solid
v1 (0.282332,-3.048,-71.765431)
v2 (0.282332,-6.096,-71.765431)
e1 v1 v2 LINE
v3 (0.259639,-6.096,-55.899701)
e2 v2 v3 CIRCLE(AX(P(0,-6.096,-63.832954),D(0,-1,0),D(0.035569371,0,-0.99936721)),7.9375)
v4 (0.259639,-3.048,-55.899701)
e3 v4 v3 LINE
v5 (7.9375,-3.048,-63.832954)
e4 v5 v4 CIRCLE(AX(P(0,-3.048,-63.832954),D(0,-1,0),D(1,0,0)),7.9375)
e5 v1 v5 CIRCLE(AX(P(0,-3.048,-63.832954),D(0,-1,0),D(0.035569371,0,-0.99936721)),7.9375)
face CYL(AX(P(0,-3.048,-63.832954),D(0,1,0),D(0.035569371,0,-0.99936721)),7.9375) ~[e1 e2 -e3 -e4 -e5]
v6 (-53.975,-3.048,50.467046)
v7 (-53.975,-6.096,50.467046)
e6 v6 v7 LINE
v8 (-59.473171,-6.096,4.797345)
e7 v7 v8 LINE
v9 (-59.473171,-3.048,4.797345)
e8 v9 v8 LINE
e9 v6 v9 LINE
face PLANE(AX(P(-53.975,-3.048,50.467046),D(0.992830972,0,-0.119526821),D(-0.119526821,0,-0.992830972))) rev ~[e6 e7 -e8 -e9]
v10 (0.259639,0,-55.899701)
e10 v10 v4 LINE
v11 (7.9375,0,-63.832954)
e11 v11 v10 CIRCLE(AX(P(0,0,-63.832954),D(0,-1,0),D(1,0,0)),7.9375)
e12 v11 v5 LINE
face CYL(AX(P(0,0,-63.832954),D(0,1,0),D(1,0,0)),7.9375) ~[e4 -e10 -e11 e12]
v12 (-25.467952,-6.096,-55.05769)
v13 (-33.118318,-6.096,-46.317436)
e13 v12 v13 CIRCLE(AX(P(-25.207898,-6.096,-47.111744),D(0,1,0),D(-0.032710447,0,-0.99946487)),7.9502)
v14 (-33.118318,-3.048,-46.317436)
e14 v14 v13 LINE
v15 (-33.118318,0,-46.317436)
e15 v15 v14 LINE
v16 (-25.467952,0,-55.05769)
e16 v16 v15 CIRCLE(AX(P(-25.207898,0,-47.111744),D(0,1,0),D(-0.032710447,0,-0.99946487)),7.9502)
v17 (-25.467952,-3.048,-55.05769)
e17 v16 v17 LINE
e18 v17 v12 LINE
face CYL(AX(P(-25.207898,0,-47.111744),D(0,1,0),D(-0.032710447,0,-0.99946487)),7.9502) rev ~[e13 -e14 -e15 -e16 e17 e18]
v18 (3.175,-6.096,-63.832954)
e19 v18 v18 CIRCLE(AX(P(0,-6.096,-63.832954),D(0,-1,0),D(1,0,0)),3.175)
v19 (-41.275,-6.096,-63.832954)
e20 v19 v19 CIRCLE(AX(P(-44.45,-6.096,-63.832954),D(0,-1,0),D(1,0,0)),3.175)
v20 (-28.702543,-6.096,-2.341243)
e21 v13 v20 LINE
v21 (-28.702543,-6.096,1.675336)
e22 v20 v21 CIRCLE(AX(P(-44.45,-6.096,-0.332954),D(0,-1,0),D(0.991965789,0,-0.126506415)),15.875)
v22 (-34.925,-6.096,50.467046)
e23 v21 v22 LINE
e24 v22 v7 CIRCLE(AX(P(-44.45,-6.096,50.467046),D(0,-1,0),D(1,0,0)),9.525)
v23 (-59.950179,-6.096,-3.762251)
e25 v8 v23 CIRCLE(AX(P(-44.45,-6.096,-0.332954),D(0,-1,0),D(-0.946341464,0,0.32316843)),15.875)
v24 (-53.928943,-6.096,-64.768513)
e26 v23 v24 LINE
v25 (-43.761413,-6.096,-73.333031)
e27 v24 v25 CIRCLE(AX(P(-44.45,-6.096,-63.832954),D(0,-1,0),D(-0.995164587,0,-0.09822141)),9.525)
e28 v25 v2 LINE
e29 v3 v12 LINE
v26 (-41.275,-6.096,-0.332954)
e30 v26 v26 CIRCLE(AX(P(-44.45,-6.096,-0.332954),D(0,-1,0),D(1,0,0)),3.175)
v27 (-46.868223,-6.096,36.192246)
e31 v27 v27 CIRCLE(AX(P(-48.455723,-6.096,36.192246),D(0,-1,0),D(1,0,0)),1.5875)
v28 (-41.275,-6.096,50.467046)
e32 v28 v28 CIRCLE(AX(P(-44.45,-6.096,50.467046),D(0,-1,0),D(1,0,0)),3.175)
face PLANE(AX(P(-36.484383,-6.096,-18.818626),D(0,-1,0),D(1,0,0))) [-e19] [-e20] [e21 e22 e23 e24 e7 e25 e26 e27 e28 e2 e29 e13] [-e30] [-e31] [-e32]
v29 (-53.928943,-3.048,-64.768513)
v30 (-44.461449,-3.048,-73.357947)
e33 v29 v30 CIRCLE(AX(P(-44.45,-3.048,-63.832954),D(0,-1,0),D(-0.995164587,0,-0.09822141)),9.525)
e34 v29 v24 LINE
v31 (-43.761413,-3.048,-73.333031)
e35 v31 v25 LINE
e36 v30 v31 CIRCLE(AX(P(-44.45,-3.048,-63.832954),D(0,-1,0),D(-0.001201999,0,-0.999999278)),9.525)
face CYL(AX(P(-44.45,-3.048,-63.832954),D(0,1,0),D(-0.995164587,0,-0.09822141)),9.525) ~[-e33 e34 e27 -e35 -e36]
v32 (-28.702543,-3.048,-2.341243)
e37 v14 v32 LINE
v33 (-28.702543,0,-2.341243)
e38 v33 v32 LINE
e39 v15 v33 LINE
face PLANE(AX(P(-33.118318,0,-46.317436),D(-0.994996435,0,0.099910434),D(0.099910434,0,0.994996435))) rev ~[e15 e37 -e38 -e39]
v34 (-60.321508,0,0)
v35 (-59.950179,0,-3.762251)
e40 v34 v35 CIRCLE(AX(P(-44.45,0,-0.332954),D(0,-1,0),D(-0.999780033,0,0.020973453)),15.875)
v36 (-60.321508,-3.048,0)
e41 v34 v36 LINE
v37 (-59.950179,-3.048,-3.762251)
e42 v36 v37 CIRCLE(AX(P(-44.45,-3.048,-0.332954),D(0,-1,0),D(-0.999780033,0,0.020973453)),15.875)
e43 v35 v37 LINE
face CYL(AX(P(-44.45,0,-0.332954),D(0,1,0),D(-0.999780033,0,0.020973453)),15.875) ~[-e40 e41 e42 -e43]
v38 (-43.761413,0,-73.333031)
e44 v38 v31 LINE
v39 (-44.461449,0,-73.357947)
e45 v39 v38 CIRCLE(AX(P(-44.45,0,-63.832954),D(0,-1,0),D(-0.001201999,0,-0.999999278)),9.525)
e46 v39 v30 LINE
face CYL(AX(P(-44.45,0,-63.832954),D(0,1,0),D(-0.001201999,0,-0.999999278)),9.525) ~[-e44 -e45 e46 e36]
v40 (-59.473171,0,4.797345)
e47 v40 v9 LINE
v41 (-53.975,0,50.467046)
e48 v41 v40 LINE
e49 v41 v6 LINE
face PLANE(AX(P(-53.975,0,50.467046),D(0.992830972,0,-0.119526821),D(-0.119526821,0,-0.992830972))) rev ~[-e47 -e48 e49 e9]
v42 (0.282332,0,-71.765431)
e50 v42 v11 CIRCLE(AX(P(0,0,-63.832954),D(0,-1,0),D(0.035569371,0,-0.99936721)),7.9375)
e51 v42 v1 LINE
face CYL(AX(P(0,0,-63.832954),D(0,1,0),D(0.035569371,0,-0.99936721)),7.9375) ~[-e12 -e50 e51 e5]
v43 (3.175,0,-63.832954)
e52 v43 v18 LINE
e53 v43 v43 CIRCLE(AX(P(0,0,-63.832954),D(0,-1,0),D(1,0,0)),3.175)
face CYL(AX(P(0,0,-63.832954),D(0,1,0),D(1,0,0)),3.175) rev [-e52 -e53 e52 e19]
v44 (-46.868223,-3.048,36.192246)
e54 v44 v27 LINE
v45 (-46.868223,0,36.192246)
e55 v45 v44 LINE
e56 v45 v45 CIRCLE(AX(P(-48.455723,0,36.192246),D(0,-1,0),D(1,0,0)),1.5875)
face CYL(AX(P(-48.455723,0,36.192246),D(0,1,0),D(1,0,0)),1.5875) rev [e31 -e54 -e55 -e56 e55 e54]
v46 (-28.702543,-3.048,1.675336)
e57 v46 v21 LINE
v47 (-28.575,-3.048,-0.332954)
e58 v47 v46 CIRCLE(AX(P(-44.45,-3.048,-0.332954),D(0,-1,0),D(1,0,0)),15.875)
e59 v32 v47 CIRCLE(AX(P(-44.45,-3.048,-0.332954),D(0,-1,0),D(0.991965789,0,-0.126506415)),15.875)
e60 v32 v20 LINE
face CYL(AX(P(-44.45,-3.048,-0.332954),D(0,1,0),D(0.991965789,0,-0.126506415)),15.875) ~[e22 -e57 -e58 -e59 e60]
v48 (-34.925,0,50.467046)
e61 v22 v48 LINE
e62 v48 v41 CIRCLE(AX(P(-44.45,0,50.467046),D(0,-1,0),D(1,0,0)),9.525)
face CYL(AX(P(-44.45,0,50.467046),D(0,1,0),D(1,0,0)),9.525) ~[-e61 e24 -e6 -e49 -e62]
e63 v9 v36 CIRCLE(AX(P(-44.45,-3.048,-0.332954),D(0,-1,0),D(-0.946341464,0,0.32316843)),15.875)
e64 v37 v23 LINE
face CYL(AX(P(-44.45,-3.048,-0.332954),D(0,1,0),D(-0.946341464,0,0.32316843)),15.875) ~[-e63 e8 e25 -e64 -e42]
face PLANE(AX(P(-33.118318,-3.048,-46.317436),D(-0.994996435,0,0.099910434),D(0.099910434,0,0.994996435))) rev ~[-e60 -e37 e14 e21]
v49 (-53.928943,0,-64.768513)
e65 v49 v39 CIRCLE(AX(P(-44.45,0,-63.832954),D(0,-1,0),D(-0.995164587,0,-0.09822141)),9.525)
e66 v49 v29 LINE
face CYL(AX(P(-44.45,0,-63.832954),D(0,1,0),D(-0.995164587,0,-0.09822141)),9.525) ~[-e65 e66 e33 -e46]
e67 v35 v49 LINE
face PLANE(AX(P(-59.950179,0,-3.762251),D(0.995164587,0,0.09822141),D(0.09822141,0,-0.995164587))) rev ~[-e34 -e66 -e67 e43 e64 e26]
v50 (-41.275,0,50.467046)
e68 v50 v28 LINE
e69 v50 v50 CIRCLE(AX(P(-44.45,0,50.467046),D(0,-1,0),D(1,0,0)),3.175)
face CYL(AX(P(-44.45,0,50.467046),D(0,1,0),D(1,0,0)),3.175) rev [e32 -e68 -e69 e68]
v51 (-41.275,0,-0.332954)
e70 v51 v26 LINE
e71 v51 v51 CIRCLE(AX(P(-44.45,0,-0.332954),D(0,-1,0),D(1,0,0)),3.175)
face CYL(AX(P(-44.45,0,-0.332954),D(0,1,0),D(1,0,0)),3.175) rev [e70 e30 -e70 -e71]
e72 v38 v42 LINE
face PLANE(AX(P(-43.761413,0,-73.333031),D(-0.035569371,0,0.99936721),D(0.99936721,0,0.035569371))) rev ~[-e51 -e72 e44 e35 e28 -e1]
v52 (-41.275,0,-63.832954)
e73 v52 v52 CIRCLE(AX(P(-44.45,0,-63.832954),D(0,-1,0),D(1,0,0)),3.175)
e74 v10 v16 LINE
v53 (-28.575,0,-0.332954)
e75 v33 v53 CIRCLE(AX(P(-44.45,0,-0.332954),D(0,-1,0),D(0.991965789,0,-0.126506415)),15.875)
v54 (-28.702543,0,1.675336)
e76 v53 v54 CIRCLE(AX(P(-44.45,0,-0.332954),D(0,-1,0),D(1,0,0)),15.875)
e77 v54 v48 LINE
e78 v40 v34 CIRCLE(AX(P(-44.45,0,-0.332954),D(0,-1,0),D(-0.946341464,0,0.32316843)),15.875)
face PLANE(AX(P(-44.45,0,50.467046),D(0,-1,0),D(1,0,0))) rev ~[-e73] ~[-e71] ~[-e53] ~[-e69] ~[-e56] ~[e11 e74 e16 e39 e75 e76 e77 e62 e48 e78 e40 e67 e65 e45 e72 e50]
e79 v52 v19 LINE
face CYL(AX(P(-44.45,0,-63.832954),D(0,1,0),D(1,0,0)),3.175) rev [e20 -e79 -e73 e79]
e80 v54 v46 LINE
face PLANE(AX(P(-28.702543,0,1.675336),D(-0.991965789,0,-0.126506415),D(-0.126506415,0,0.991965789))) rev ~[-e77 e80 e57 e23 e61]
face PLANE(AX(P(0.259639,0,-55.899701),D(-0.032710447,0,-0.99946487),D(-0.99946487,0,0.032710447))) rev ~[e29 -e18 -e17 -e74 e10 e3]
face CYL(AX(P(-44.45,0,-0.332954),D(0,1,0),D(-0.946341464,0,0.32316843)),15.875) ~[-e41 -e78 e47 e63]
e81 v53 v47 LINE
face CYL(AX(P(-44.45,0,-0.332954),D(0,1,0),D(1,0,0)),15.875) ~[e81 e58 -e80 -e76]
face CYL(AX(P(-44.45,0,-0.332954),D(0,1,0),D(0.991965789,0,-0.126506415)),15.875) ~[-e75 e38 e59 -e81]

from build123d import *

# Parameters (mm, degrees)
F0_R        = 3.175
F0_R_2      = 1.5875
F1_DEPTH    = 3.048
F1_FACE_R   = 3.175
F1_FACE_R_2 = 1.5875
F2_DEPTH    = 3.048


# Not quite as in the source:
# - after a boolean that leaves OpenCascade's solid faulty, fix() repairs it


with BuildPart() as f1:
    # F0 (on Front) → F1 (new body)
    with BuildSketch(Plane.XZ):
        with BuildLine():
            ThreePointArc((-53.975, 50.4670464277), (-44.45, 40.9420464277), (-34.925, 50.4670464277))
            ThreePointArc((-34.925, 50.4670464277), (-44.45, 59.9920464277), (-53.975, 50.4670464277))
        make_face()
        with Locations((-44.45, 50.4670464277)):
            Circle(F0_R, mode=Mode.SUBTRACT)
        with BuildLine():
            Line((-28.7025430953, 1.6753357581), (-34.925, 50.4670464277))
            ThreePointArc((-34.925, 50.4670464277), (-44.45, 40.9420464277), (-53.975, 50.4670464277))
            Line((-53.975, 50.4670464277), (-59.4731707335, 4.7973452602))
            ThreePointArc((-59.4731707335, 4.7973452602), (-42.8475383164, 15.4609611278), (-28.7025430953, 1.6753357581))
        make_face()
        with Locations((-48.45572263, 36.1922464277)):
            Circle(F0_R_2, mode=Mode.SUBTRACT)
        with BuildLine():
            ThreePointArc((-28.575, -0.3329535723), (-28.6069178604, 0.6732140673), (-28.7025430953, 1.6753357581))
            ThreePointArc((-28.7025430953, 1.6753357581), (-42.8475383164, 15.4609611278), (-59.4731707335, 4.7973452602))
            ThreePointArc((-59.4731707335, 4.7973452602), (-60.0824637934, 2.4314090575), (-60.3215080228, 0))
            Line((-60.3215080228, 0), (-59.9501789354, -3.7622505804))
            ThreePointArc((-59.9501789354, -3.7622505804), (-43.7288188136, -16.1915639369), (-28.7025430953, -2.3412429026))
            ThreePointArc((-28.7025430953, -2.3412429026), (-28.6069178604, -1.3391212118), (-28.575, -0.3329535723))
        make_face()
        with Locations((-44.45, -0.3329535723)):
            Circle(F0_R, mode=Mode.SUBTRACT)
        with BuildLine():
            Line((-59.9501789354, -3.7622505804), (-60.3215080228, 0))
            ThreePointArc((-60.3215080228, 0), (-60.2482378134, -1.8922184603), (-59.9501789354, -3.7622505804))
        make_face()
        with BuildLine():
            Line((-33.1183182382, -46.317436026), (-28.7025430953, -2.3412429026))
            ThreePointArc((-28.7025430953, -2.3412429026), (-43.7288188136, -16.1915639369), (-59.9501789354, -3.7622505804))
            Line((-59.9501789354, -3.7622505804), (-53.928942688, -64.7685125051))
            ThreePointArc((-53.928942688, -64.7685125051), (-44.9183459706, -54.3194748683), (-34.925, -63.8329535723))
            ThreePointArc((-34.925, -63.8329535723), (-37.4756032752, -70.3201267105), (-43.7614126668, -73.3330310711))
            Line((-43.7614126668, -73.3330310711), (0.2823318858, -71.7654307992))
            ThreePointArc((0.2823318858, -71.7654307992), (-7.9374918809, -63.8443065466), (0.2596391732, -55.8997011655))
            Line((0.2596391732, -55.8997011655), (-25.4679521782, -55.0576895661))
            ThreePointArc((-25.4679521782, -55.0576895661), (-31.1901358295, -52.3480122444), (-33.1183182382, -46.317436026))
        make_face()
        with BuildLine():
            ThreePointArc((-34.925, -63.8329535723), (-44.9183459706, -54.3194748683), (-53.928942688, -64.7685125051))
            ThreePointArc((-53.928942688, -64.7685125051), (-50.8501155234, -70.8873242945), (-44.4614490432, -73.3579466914))
            Line((-44.4614490432, -73.3579466914), (-43.7614126668, -73.3330310711))
            ThreePointArc((-43.7614126668, -73.3330310711), (-37.4756032752, -70.3201267105), (-34.925, -63.8329535723))
        make_face()
        with Locations((-44.45, -63.8329535723)):
            Circle(F0_R, mode=Mode.SUBTRACT)
        with BuildLine():
            Line((-43.7614126668, -73.3330310711), (-44.4614490432, -73.3579466914))
            ThreePointArc((-44.4614490432, -73.3579466914), (-44.111201737, -73.3519262446), (-43.7614126668, -73.3330310711))
        make_face()
        with BuildLine():
            ThreePointArc((7.9375, -63.8329535723), (5.7037177432, -58.3128530156), (0.2596391732, -55.8997011655))
            ThreePointArc((0.2596391732, -55.8997011655), (-7.9374918809, -63.8443065466), (0.2823318858, -71.7654307992))
            ThreePointArc((0.2823318858, -71.7654307992), (5.7116072866, -69.344890478), (7.9375, -63.8329535723))
        make_face()
        with Locations((0, -63.8329535723)):
            Circle(F0_R, mode=Mode.SUBTRACT)
    extrude(amount=F1_DEPTH)

    # F0 (on Front) + F1_face (on face) → F2 (join)
    with BuildSketch(Plane.XZ):
        with BuildLine():
            ThreePointArc((-53.975, 50.4670464277), (-44.45, 40.9420464277), (-34.925, 50.4670464277))
            ThreePointArc((-34.925, 50.4670464277), (-44.45, 59.9920464277), (-53.975, 50.4670464277))
        make_face()
        with Locations((-44.45, 50.4670464277)):
            Circle(F0_R, mode=Mode.SUBTRACT)
        with BuildLine():
            Line((-28.7025430953, 1.6753357581), (-34.925, 50.4670464277))
            ThreePointArc((-34.925, 50.4670464277), (-44.45, 40.9420464277), (-53.975, 50.4670464277))
            Line((-53.975, 50.4670464277), (-59.4731707335, 4.7973452602))
            ThreePointArc((-59.4731707335, 4.7973452602), (-42.8475383164, 15.4609611278), (-28.7025430953, 1.6753357581))
        make_face()
        with Locations((-48.45572263, 36.1922464277)):
            Circle(F0_R_2, mode=Mode.SUBTRACT)
        with BuildLine():
            ThreePointArc((-28.575, -0.3329535723), (-28.6069178604, 0.6732140673), (-28.7025430953, 1.6753357581))
            ThreePointArc((-28.7025430953, 1.6753357581), (-42.8475383164, 15.4609611278), (-59.4731707335, 4.7973452602))
            ThreePointArc((-59.4731707335, 4.7973452602), (-60.0824637934, 2.4314090575), (-60.3215080228, 0))
            Line((-60.3215080228, 0), (-59.9501789354, -3.7622505804))
            ThreePointArc((-59.9501789354, -3.7622505804), (-43.7288188136, -16.1915639369), (-28.7025430953, -2.3412429026))
            ThreePointArc((-28.7025430953, -2.3412429026), (-28.6069178604, -1.3391212118), (-28.575, -0.3329535723))
        make_face()
        with Locations((-44.45, -0.3329535723)):
            Circle(F0_R, mode=Mode.SUBTRACT)
        with BuildLine():
            Line((-59.9501789354, -3.7622505804), (-60.3215080228, 0))
            ThreePointArc((-60.3215080228, 0), (-60.2482378134, -1.8922184603), (-59.9501789354, -3.7622505804))
        make_face()
        with BuildLine():
            Line((-33.1183182382, -46.317436026), (-28.7025430953, -2.3412429026))
            ThreePointArc((-28.7025430953, -2.3412429026), (-43.7288188136, -16.1915639369), (-59.9501789354, -3.7622505804))
            Line((-59.9501789354, -3.7622505804), (-53.928942688, -64.7685125051))
            ThreePointArc((-53.928942688, -64.7685125051), (-44.9183459706, -54.3194748683), (-34.925, -63.8329535723))
            ThreePointArc((-34.925, -63.8329535723), (-37.4756032752, -70.3201267105), (-43.7614126668, -73.3330310711))
            Line((-43.7614126668, -73.3330310711), (0.2823318858, -71.7654307992))
            ThreePointArc((0.2823318858, -71.7654307992), (-7.9374918809, -63.8443065466), (0.2596391732, -55.8997011655))
            Line((0.2596391732, -55.8997011655), (-25.4679521782, -55.0576895661))
            ThreePointArc((-25.4679521782, -55.0576895661), (-31.1901358295, -52.3480122444), (-33.1183182382, -46.317436026))
        make_face()
        with BuildLine():
            ThreePointArc((-34.925, -63.8329535723), (-44.9183459706, -54.3194748683), (-53.928942688, -64.7685125051))
            ThreePointArc((-53.928942688, -64.7685125051), (-50.8501155234, -70.8873242945), (-44.4614490432, -73.3579466914))
            Line((-44.4614490432, -73.3579466914), (-43.7614126668, -73.3330310711))
            ThreePointArc((-43.7614126668, -73.3330310711), (-37.4756032752, -70.3201267105), (-34.925, -63.8329535723))
        make_face()
        with Locations((-44.45, -63.8329535723)):
            Circle(F0_R, mode=Mode.SUBTRACT)
        with BuildLine():
            Line((-43.7614126668, -73.3330310711), (-44.4614490432, -73.3579466914))
            ThreePointArc((-44.4614490432, -73.3579466914), (-44.111201737, -73.3519262446), (-43.7614126668, -73.3330310711))
        make_face()
        with BuildLine():
            ThreePointArc((7.9375, -63.8329535723), (5.7037177432, -58.3128530156), (0.2596391732, -55.8997011655))
            ThreePointArc((0.2596391732, -55.8997011655), (-7.9374918809, -63.8443065466), (0.2823318858, -71.7654307992))
            ThreePointArc((0.2823318858, -71.7654307992), (5.7116072866, -69.344890478), (7.9375, -63.8329535723))
        make_face()
        with Locations((0, -63.8329535723)):
            Circle(F0_R, mode=Mode.SUBTRACT)
    with BuildSketch(Plane(origin=(-39.2541813262, -3.048, -16.9379503901), x_dir=(1, 0, 0), z_dir=(0, -1, 0))):
        with BuildLine():
            ThreePointArc((4.3291813262, 67.4049968178), (-5.1958186738, 76.9299968178), (-14.7208186738, 67.4049968178))
            Line((-14.7208186738, 67.4049968178), (-20.2189894074, 21.7352956503))
            ThreePointArc((-20.2189894074, 21.7352956503), (-21.0462252614, 17.4883065075), (-20.6959976093, 13.1756998097))
            Line((-20.6959976093, 13.1756998097), (-14.6747613619, -47.830562115))
            ThreePointArc((-14.6747613619, -47.830562115), (-11.3322126787, -54.1799392572), (-4.5072313406, -56.395080681))
            Line((-4.5072313406, -56.395080681), (39.536513212, -54.8274804091))
            ThreePointArc((39.536513212, -54.8274804091), (47.1916732071, -46.8836502078), (39.5138204994, -38.9617507754))
            Line((39.5138204994, -38.9617507754), (13.7862291479, -38.119739176))
            ThreePointArc((13.7862291479, -38.119739176), (8.0640454966, -35.4100618543), (6.1358630879, -29.3794856359))
            Line((6.1358630879, -29.3794856359), (10.5516382309, 14.5967074875))
            ThreePointArc((10.5516382309, 14.5967074875), (10.6791813262, 16.6049968178), (10.5516382309, 18.6132861482))
            Line((10.5516382309, 18.6132861482), (4.3291813262, 67.4049968178))
        make_face()
        with Locations((-5.1958186738, 67.4049968178)):
            Circle(F1_FACE_R, mode=Mode.SUBTRACT)
        with Locations((-9.2015413039, 53.1301968178)):
            Circle(F1_FACE_R_2, mode=Mode.SUBTRACT)
        with Locations((-5.1958186738, 16.6049968178)):
            Circle(F1_FACE_R, mode=Mode.SUBTRACT)
        with Locations((-5.1958186738, -46.8950031822)):
            Circle(F1_FACE_R, mode=Mode.SUBTRACT)
        with Locations((39.2541813262, -46.8950031822)):
            Circle(F1_FACE_R, mode=Mode.SUBTRACT)
    extrude(amount=F2_DEPTH)

    add(f1.part.fix(), mode=Mode.REPLACE)


solid = f1.part
